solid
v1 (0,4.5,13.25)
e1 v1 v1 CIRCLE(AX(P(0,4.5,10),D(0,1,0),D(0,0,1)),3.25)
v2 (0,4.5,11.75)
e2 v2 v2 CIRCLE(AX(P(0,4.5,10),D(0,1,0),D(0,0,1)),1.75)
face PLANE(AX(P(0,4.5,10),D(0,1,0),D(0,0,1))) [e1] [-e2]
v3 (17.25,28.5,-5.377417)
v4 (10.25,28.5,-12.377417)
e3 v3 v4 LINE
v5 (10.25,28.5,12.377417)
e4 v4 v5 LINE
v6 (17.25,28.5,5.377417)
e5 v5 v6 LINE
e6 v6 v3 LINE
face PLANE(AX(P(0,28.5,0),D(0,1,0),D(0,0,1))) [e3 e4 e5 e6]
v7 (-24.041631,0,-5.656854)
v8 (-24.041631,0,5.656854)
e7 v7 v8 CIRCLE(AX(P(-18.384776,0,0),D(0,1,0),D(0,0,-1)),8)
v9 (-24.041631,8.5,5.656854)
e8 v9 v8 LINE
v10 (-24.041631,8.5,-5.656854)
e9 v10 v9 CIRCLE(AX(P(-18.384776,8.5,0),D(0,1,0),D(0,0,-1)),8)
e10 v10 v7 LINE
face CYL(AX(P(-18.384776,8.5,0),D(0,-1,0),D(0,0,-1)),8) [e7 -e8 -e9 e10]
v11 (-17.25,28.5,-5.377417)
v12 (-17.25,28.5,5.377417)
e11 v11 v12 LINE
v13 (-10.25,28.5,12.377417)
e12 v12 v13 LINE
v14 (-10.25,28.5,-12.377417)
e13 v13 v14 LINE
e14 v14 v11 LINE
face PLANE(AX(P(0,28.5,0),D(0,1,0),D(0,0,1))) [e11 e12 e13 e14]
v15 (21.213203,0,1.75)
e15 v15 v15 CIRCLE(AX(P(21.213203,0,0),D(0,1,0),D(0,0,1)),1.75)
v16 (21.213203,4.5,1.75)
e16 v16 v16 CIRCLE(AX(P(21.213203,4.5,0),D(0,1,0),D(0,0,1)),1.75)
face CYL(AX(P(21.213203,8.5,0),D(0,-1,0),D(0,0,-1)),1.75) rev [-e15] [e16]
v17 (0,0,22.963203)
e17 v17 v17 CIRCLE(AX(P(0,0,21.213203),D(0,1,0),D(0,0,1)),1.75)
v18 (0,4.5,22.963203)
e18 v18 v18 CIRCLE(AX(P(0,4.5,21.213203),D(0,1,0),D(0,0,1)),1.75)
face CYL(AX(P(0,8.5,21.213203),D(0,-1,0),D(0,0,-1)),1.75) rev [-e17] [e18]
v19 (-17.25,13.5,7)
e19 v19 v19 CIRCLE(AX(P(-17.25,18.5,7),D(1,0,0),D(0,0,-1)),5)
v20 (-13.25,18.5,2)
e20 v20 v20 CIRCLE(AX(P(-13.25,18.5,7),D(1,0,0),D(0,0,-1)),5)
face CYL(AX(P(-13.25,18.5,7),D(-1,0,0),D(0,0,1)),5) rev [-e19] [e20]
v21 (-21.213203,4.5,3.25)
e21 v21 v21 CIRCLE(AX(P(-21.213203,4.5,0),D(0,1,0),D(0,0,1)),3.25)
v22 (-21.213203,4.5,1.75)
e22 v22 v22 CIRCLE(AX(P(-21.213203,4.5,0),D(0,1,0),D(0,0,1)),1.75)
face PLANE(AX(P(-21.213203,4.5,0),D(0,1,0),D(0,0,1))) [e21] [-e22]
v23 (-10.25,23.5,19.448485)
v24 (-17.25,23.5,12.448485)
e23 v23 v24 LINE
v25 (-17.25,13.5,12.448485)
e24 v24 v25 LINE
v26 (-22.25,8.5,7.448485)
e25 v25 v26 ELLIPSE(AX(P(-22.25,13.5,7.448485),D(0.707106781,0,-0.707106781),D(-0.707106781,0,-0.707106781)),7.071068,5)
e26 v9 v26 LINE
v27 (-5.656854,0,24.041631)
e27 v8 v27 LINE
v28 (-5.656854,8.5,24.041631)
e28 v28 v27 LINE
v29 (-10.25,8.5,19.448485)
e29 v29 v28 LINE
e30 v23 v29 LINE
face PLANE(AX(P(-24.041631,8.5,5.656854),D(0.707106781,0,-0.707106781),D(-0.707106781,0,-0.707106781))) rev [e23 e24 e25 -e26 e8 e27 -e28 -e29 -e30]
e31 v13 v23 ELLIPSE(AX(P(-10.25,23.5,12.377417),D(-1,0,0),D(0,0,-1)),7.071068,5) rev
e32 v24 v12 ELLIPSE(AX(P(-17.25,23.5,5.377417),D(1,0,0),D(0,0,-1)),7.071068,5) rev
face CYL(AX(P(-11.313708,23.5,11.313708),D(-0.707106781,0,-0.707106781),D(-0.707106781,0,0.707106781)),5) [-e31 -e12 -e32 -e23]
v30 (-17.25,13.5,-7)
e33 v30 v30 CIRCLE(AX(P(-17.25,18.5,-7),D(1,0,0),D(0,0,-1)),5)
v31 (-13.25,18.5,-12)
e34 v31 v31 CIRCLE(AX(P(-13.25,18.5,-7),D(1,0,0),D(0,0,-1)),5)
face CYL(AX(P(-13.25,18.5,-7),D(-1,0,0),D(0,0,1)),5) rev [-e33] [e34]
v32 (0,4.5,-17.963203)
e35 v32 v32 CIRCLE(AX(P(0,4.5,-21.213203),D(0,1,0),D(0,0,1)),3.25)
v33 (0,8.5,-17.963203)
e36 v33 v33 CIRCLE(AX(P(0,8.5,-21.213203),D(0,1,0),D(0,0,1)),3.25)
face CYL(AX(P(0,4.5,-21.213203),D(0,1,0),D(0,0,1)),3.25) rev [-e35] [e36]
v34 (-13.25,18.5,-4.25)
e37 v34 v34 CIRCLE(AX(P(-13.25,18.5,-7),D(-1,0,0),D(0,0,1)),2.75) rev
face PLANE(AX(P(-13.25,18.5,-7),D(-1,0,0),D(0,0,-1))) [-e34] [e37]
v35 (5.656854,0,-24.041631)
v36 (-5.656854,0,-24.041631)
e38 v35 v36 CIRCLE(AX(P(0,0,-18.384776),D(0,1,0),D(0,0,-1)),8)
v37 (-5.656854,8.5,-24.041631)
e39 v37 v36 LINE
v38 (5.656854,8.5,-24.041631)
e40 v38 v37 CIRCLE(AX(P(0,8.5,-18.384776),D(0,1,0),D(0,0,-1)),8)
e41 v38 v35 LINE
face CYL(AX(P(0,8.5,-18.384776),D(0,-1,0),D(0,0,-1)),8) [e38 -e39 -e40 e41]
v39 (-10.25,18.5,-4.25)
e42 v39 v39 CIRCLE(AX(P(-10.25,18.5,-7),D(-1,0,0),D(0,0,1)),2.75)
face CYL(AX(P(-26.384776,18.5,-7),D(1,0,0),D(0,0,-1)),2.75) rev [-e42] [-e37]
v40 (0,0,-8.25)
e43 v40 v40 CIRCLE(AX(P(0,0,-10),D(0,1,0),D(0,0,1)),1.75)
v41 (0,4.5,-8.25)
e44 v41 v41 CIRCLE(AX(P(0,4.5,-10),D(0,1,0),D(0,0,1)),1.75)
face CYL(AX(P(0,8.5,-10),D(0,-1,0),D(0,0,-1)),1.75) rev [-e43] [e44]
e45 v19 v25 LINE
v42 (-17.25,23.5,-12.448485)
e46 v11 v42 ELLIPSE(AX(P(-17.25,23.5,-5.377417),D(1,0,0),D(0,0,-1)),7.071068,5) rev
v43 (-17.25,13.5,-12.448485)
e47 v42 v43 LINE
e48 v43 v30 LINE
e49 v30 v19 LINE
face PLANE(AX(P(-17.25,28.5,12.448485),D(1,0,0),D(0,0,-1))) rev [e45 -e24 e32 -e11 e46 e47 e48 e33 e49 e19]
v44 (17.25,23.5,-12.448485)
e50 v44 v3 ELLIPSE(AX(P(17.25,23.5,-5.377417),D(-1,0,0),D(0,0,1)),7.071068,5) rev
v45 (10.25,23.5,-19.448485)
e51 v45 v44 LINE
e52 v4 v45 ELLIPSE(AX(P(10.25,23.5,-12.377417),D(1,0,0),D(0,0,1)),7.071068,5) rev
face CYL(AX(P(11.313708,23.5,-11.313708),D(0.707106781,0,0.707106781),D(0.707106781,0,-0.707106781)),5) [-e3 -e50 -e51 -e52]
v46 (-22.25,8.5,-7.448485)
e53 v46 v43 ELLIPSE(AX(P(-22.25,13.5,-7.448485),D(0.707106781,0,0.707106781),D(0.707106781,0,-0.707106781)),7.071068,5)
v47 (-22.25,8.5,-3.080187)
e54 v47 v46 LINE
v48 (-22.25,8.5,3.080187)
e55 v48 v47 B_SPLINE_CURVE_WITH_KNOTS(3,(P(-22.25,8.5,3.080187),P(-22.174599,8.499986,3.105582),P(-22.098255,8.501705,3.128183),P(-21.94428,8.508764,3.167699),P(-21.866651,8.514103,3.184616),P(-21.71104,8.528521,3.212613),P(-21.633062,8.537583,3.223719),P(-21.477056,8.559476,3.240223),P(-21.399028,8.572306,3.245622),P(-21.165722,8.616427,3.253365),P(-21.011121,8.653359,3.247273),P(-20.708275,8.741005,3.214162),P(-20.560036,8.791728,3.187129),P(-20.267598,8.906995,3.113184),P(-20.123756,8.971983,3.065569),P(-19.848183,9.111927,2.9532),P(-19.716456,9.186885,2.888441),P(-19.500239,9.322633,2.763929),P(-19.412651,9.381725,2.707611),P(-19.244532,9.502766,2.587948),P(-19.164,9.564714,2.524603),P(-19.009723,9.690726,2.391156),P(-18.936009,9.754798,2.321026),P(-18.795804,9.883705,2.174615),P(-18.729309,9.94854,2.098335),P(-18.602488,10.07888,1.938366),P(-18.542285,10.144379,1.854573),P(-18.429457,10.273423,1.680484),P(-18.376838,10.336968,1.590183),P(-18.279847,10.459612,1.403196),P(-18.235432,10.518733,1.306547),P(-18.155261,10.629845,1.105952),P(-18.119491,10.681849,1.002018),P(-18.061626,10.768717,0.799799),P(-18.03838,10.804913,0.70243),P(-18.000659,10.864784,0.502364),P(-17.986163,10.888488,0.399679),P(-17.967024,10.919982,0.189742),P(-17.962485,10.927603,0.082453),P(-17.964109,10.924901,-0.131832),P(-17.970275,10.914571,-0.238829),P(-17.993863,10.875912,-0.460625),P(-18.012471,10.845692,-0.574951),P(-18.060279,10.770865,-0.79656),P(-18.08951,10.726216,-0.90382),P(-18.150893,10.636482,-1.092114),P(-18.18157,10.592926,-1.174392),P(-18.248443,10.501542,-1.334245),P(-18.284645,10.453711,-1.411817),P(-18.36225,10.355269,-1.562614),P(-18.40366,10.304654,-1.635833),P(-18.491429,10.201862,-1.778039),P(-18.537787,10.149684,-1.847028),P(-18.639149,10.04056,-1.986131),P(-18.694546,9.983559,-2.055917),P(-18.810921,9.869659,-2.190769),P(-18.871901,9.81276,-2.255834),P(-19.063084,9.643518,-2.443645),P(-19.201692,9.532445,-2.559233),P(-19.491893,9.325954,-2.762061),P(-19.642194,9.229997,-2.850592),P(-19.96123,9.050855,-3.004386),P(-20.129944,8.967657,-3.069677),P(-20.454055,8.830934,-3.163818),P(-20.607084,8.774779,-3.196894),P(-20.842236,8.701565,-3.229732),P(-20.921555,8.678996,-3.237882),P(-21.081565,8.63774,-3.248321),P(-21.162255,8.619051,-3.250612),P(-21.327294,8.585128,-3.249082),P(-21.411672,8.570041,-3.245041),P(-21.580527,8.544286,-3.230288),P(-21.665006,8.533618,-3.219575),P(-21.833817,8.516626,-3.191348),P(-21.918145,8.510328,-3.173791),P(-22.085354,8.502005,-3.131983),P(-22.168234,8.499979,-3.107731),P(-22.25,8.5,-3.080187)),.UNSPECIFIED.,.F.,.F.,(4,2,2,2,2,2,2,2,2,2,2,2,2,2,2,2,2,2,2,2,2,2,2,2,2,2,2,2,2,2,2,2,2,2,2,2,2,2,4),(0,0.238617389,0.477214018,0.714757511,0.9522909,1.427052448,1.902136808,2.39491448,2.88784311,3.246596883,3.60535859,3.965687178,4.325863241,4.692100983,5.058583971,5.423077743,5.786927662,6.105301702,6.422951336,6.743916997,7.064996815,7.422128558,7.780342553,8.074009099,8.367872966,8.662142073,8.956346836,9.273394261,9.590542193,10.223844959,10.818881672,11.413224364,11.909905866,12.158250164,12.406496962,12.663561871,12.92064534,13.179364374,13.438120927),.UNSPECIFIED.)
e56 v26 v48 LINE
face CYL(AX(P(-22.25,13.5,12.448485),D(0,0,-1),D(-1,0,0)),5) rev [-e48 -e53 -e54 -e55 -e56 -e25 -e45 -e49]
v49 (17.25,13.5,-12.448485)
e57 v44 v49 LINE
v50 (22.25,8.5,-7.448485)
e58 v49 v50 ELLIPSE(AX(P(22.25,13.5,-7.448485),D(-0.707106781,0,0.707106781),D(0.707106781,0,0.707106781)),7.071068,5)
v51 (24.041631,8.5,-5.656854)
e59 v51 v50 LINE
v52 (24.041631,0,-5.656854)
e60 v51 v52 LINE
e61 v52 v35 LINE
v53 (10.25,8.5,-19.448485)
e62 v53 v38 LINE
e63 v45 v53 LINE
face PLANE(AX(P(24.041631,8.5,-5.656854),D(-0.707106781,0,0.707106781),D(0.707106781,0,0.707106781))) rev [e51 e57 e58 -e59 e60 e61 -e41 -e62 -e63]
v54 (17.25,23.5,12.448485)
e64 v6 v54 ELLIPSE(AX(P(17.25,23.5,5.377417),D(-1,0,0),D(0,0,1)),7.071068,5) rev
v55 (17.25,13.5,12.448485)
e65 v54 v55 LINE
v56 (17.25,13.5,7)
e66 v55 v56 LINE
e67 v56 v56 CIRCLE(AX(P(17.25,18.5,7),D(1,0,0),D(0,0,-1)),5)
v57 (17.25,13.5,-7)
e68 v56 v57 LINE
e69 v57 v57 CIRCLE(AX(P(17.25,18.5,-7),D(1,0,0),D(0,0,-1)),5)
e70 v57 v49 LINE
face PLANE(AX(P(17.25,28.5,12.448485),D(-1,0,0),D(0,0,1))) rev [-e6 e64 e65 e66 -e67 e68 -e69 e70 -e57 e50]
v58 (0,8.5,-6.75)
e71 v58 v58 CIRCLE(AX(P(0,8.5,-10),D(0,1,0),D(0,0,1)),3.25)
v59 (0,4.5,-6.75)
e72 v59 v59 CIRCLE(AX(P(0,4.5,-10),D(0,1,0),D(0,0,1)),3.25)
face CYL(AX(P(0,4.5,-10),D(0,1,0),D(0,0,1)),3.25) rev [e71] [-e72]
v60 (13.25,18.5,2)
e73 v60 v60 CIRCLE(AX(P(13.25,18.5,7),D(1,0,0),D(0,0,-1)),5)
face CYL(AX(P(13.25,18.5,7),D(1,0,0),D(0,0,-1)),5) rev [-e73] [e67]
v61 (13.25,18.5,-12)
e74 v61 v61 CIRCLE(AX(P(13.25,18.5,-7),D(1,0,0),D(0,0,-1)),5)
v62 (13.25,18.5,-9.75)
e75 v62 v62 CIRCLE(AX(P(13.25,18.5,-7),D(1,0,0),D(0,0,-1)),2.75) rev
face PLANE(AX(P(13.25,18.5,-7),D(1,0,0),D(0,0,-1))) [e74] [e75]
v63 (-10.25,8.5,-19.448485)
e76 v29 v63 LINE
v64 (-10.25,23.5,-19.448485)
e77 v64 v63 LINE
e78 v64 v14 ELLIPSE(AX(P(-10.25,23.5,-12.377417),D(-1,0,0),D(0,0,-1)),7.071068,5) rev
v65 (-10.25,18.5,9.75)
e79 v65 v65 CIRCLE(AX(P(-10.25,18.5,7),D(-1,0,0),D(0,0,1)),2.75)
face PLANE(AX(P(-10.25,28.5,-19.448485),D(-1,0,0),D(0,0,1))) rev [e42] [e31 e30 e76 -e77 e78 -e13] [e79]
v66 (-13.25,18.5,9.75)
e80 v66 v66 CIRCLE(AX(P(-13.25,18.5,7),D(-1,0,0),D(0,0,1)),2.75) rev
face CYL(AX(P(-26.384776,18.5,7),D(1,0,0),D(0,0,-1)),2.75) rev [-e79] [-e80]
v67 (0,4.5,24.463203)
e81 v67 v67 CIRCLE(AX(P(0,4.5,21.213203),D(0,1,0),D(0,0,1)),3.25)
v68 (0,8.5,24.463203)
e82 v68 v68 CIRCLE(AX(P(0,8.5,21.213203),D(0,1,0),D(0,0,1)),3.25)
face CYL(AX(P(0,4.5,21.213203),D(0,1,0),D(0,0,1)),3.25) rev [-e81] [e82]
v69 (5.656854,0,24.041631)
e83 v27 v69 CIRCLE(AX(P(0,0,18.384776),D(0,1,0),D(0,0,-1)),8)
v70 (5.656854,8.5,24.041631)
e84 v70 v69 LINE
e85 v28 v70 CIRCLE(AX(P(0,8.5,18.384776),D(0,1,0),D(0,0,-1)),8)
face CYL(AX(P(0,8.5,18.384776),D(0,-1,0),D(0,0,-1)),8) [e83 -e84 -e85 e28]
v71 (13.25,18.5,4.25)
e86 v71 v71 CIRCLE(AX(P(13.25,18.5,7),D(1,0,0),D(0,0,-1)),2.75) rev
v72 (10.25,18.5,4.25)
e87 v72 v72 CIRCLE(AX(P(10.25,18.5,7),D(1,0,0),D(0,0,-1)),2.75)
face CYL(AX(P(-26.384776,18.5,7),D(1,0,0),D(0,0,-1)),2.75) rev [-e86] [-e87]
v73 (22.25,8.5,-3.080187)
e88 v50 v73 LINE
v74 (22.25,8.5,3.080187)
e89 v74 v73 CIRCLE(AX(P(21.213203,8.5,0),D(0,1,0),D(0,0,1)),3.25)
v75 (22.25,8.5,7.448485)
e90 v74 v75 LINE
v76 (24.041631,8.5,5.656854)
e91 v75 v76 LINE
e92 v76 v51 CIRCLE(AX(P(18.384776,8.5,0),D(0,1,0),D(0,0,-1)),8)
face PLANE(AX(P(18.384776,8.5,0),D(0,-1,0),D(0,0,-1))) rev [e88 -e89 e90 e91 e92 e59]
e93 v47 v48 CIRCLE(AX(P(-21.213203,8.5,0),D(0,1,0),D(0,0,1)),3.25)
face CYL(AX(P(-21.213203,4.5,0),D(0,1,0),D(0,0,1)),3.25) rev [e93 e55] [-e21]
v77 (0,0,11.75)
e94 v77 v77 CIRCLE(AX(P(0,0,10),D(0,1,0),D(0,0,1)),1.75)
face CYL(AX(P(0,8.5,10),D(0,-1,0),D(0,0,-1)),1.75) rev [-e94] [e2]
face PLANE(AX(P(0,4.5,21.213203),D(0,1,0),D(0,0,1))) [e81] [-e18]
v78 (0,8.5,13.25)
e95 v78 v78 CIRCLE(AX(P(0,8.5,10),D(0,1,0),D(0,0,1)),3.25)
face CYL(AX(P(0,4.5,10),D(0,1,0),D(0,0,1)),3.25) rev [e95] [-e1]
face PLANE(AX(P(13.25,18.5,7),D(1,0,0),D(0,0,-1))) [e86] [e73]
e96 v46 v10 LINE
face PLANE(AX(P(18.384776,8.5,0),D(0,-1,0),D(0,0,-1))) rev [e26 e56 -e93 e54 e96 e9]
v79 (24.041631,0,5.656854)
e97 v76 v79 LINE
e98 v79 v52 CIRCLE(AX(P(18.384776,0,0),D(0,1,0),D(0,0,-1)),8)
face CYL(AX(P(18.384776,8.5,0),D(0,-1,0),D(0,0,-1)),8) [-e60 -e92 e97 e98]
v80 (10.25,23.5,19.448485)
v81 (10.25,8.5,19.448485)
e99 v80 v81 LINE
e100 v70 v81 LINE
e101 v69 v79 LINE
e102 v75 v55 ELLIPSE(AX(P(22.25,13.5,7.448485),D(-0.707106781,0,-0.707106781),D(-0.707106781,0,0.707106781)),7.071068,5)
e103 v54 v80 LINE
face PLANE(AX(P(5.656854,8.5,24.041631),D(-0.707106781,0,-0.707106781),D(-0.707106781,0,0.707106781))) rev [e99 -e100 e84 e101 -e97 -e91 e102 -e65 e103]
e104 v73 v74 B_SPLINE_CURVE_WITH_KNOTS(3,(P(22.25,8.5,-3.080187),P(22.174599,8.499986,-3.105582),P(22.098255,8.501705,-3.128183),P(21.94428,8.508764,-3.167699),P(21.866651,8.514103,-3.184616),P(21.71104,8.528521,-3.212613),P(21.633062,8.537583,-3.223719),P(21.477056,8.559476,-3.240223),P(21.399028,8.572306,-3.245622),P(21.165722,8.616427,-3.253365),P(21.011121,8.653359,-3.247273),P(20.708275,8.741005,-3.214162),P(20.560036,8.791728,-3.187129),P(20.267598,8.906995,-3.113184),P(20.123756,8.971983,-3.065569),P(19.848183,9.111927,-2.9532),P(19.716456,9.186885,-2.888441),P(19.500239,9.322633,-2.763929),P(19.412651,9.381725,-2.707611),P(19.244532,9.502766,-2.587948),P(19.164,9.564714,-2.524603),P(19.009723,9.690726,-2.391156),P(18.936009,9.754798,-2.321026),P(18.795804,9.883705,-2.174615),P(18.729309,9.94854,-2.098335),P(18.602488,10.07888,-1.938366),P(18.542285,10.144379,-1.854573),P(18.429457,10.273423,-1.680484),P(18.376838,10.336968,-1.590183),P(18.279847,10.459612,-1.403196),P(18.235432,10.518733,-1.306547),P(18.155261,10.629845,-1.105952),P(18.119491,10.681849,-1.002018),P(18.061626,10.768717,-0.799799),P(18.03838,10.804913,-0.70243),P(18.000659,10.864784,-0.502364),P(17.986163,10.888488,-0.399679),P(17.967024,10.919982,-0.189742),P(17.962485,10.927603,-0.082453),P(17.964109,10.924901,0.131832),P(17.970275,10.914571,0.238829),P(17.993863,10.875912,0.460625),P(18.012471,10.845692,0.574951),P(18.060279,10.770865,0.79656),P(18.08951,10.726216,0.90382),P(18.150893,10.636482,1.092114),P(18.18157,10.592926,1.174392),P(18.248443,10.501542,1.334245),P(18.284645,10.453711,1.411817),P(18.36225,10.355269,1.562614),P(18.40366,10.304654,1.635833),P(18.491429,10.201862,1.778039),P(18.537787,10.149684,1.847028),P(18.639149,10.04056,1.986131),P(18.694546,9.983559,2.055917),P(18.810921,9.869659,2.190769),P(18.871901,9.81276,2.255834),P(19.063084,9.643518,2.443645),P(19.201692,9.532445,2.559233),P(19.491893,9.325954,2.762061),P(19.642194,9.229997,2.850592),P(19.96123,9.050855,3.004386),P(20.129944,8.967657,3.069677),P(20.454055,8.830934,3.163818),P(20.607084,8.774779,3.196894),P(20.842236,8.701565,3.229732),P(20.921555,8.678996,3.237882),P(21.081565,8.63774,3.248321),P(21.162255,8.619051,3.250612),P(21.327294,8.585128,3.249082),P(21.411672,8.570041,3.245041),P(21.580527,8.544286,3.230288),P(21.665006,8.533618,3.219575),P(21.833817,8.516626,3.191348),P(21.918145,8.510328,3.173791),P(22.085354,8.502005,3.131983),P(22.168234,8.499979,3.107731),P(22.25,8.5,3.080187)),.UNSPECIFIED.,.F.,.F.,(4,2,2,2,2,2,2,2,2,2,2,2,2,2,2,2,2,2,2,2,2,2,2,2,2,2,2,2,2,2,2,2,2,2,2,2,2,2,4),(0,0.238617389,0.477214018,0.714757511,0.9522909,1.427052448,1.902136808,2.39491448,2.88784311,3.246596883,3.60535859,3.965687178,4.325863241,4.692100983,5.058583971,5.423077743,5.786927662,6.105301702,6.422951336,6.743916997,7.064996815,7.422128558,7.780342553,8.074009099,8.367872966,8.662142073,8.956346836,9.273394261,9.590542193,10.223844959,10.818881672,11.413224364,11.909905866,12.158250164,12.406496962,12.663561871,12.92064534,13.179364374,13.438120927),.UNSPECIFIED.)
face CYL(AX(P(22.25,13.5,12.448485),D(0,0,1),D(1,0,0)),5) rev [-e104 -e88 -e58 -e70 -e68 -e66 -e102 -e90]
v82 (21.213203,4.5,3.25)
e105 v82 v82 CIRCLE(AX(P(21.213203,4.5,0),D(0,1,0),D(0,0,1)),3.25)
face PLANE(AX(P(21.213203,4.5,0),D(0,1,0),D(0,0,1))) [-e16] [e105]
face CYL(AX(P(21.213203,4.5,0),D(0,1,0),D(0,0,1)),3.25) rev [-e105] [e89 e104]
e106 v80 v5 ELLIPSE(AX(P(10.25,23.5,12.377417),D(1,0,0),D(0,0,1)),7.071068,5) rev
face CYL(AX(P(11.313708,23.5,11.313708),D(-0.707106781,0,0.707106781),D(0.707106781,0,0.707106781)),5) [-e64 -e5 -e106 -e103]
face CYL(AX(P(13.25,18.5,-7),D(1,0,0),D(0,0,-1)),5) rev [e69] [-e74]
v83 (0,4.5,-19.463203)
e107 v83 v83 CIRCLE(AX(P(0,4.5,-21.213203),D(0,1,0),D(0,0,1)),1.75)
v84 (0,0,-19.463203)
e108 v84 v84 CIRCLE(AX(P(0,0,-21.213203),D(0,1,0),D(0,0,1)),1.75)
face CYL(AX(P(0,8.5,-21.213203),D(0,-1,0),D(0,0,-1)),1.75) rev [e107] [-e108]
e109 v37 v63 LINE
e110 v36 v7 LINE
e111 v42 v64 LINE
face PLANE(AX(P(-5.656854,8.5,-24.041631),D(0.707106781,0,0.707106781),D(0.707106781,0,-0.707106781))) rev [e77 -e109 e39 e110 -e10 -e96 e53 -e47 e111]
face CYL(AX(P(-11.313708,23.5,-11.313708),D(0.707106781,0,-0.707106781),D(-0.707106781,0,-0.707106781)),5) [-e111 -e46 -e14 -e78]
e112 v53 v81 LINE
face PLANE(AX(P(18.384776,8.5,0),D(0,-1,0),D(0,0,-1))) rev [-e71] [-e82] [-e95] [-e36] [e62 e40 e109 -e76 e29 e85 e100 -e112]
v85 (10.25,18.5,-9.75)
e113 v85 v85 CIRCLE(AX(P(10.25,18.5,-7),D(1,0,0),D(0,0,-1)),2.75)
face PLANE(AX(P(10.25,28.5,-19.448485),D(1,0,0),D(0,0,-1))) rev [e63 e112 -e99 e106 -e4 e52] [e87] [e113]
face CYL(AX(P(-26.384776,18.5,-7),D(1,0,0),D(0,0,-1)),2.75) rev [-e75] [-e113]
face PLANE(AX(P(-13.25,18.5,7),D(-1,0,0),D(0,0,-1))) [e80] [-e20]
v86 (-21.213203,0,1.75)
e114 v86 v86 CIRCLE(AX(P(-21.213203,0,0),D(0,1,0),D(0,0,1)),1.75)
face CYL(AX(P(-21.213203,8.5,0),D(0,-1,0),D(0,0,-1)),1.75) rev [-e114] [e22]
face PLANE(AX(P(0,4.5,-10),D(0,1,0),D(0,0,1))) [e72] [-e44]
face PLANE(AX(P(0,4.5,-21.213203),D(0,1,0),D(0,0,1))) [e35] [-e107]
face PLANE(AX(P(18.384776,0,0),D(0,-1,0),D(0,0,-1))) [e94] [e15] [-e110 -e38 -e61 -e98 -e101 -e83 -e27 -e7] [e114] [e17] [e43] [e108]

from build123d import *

# Parameters (mm, degrees)
SKETCH_1_R          = 1.75
EXTRUDE_1_DEPTH     = 8.5
EXTRUDE_2_DEPTH     = 20
SKETCH_3_R          = 2.75
CUT_EXTRUDE_1_DEPTH = 59.415752368
SKETCH_4_R          = 5
CUT_EXTRUDE_2_DEPTH = 4
SKETCH_5_R          = 3.25
CUT_EXTRUDE_3_DEPTH = 4
FILLET_2_R          = 5


with BuildPart() as part:
    # Эскиз1 → Бобышка-Вытянуть1 (new body)
    with BuildSketch(Plane(origin=(0, 0, 0), x_dir=(1, 0, 0), z_dir=(0, 1, 0))):
        with BuildLine():
            Line((5.656854249, -24.04163056), (24.04163056, -5.656854249))
            ThreePointArc((24.04163056, -5.656854249), (26.384776311, 0), (24.04163056, 5.656854249))
            Line((24.04163056, 5.656854249), (5.656854249, 24.04163056))
            ThreePointArc((5.656854249, 24.04163056), (0, 26.384776311), (-5.656854249, 24.04163056))
            Line((-5.656854249, 24.04163056), (-24.04163056, 5.656854249))
            ThreePointArc((-24.04163056, 5.656854249), (-26.384776311, 0), (-24.04163056, -5.656854249))
            Line((-24.04163056, -5.656854249), (-5.656854249, -24.04163056))
            ThreePointArc((-5.656854249, -24.04163056), (0, -26.384776311), (5.656854249, -24.04163056))
        make_face()
        with Locations(Location((21.213203436, 0, 0), (0, 0, 270))):
            Circle(SKETCH_1_R, mode=Mode.SUBTRACT)
        with Locations(Location((0, -10, 0), (0, 0, 270))):
            Circle(SKETCH_1_R, mode=Mode.SUBTRACT)
        with Locations(Location((0, -21.213203436, 0), (0, 0, 270))):
            Circle(SKETCH_1_R, mode=Mode.SUBTRACT)
        with Locations(Location((-21.213203436, 0, 0), (0, 0, 270))):
            Circle(SKETCH_1_R, mode=Mode.SUBTRACT)
        with Locations(Location((0, 10, 0), (0, 0, 270))):
            Circle(SKETCH_1_R, mode=Mode.SUBTRACT)
        with Locations(Location((0, 21.213203436, 0), (0, 0, 270))):
            Circle(SKETCH_1_R, mode=Mode.SUBTRACT)
    extrude(amount=EXTRUDE_1_DEPTH)

    # Эскиз2 → Бобышка-Вытянуть2 (add)
    with BuildSketch(Plane(origin=(0, 8.5, 0), x_dir=(1, 0, 0), z_dir=(0, 1, 0))):
        Polygon((-10.25, 19.44848481), (-10.25, -19.44848481), (-17.25, -12.44848481), (-17.25, 12.44848481), align=None)
        Polygon((17.25, 12.44848481), (10.25, 19.44848481), (10.25, -19.44848481), (17.25, -12.44848481), align=None)
    extrude(amount=EXTRUDE_2_DEPTH)

    # Эскиз3 → Вырез-Вытянуть1 (cut, through all)
    with BuildSketch(Plane(origin=(17.25, 0, 0), x_dir=(0, 0, -1), z_dir=(1, 0, 0))):
        with Locations((-7, 18.5)):
            Circle(SKETCH_3_R)
        with Locations((7, 18.5)):
            Circle(SKETCH_3_R)
    extrude(amount=-CUT_EXTRUDE_1_DEPTH, mode=Mode.SUBTRACT)

    # Эскиз4 → Вырез-Вытянуть2 (cut)
    with BuildSketch(Plane(origin=(17.25, 0, 0), x_dir=(0, 0, -1), z_dir=(1, 0, 0))):
        with Locations((-7, 18.5)):
            Circle(SKETCH_4_R)
        with Locations((7, 18.5)):
            Circle(SKETCH_4_R)
    cut_extrude_2 = extrude(amount=-CUT_EXTRUDE_2_DEPTH, mode=Mode.SUBTRACT)

    # Зеркальное отражение1: Вырез-Вытянуть2 across plane
    add(cut_extrude_2.mirror(Plane(origin=(0, 0, 0), x_dir=(0, 0, 1), z_dir=(1, 0, 0))), mode=Mode.SUBTRACT)

    # Эскиз5 → Вырез-Вытянуть3 (cut)
    with BuildSketch(Plane(origin=(0, 8.5, 0), x_dir=(1, 0, 0), z_dir=(0, 1, 0))):
        with Locations(Location((0, 21.213203436, 0), (0, 0, 270))):
            Circle(SKETCH_5_R)
        with Locations(Location((0, 10, 0), (0, 0, 270))):
            Circle(SKETCH_5_R)
        with Locations(Location((0, -10, 0), (0, 0, 270))):
            Circle(SKETCH_5_R)
        with Locations(Location((0, -21.213203436, 0), (0, 0, 270))):
            Circle(SKETCH_5_R)
        with Locations(Location((21.213203436, 0, 0), (0, 0, 270))):
            Circle(SKETCH_5_R)
        with Locations(Location((-21.213203436, 0, 0), (0, 0, 270))):
            Circle(SKETCH_5_R)
    extrude(amount=-CUT_EXTRUDE_3_DEPTH, mode=Mode.SUBTRACT)

    # Скругление2
    # the kernel refuses this fillet: 5 mm, written as the material it adds along each edge
    with BuildSketch(Plane(origin=(-17.25, 8.5, 24.94848481), x_dir=(-1, 0, 0), z_dir=(0, 0, -1))) as fillet_2_piece_1_section:
        with BuildLine():
            CenterArc((FILLET_2_R, FILLET_2_R), FILLET_2_R, 180, 90)
            Line((0, FILLET_2_R), (0, 0))
            Line((0, 0), (FILLET_2_R, 0))
        make_face()
    fillet_2_piece_1 = extrude(amount=49.89696962, mode=Mode.PRIVATE)
    fillet_2_piece_1 = split(fillet_2_piece_1, bisect_by=Plane(origin=(-29.470144139, 8.621513924, 0.22834067), z_dir=(0.7071067811865474, 0, -0.7071067811865477)), keep=Keep.TOP, mode=Mode.PRIVATE)
    fillet_2_piece_1 = split(fillet_2_piece_1, bisect_by=Plane(origin=(-21.171154266, 8.621513924, -8.527330544), z_dir=(0.7071067811865477, 0, 0.7071067811865474)), keep=Keep.TOP, mode=Mode.PRIVATE)
    fillet_2_piece_1 = fillet_2_piece_1 - Plane(origin=(-21.213203436, 8.621513924, 0), x_dir=(0, 0, 1), z_dir=(0, 1, 0)) * Cylinder(3.25, 120, mode=Mode.PRIVATE)
    add(fillet_2_piece_1)
    with BuildSketch(Plane(origin=(17.25, 8.5, 24.94848481), x_dir=(0, 1, 0), z_dir=(0, 0, -1))) as fillet_2_piece_2_section:
        with BuildLine():
            CenterArc((FILLET_2_R, FILLET_2_R), FILLET_2_R, 180, 90)
            Line((0, FILLET_2_R), (0, 0))
            Line((0, 0), (FILLET_2_R, 0))
        make_face()
    fillet_2_piece_2 = extrude(amount=49.89696962, mode=Mode.PRIVATE)
    fillet_2_piece_2 = split(fillet_2_piece_2, bisect_by=Plane(origin=(27.68449432, 12.192813605, 2.013990489), z_dir=(-0.7071067811865477, 0, -0.7071067811865474)), keep=Keep.TOP, mode=Mode.PRIVATE)
    fillet_2_piece_2 = split(fillet_2_piece_2, bisect_by=Plane(origin=(19.385504447, 12.192813605, -10.312980363), z_dir=(-0.7071067811865472, 0, 0.7071067811865478)), keep=Keep.TOP, mode=Mode.PRIVATE)
    fillet_2_piece_2 = fillet_2_piece_2 - Plane(origin=(21.213203436, 12.192813605, 0), x_dir=(0, 0, 1), z_dir=(0, 1, 0)) * Cylinder(3.25, 120, mode=Mode.PRIVATE)
    add(fillet_2_piece_2)
    # the kernel refuses this fillet: 5 mm, written as the material it takes off along each edge
    with BuildSketch(Plane(origin=(-26.088834765, 28.5, -3.609650045), x_dir=(0, -1, 0), z_dir=(0.7071067811865472, 0, -0.7071067811865478)), Plane(origin=(1.411165235, 28.5, 28.287319575), x_dir=(-0.7071067811865474, 0, -0.7071067811865477), z_dir=(0.7071067811865477, 0, -0.7071067811865474))) as fillet_2_2_piece_1:
        with BuildLine():
            CenterArc((FILLET_2_R, -FILLET_2_R), FILLET_2_R, 90, 90)
            Line((0, -FILLET_2_R), (0, 0))
            Line((0, 0), (FILLET_2_R, 0))
        make_face()
    extrude(amount=34.899494937, mode=Mode.SUBTRACT)
    with BuildSketch(Plane(origin=(-1.411165235, 28.5, 28.287319575), x_dir=(0.7071067811865474, 0, -0.7071067811865477), z_dir=(-0.7071067811865477, 0, -0.7071067811865474)), Plane(origin=(26.088834765, 28.5, -3.609650045), x_dir=(0, -1, 0), z_dir=(-0.7071067811865472, 0, -0.7071067811865478))) as fillet_2_2_piece_2:
        with BuildLine():
            CenterArc((FILLET_2_R, FILLET_2_R), FILLET_2_R, 180, 90)
            Line((0, FILLET_2_R), (0, 0))
            Line((0, 0), (FILLET_2_R, 0))
        make_face()
    extrude(amount=34.899494937, mode=Mode.SUBTRACT)


solid = part.part
